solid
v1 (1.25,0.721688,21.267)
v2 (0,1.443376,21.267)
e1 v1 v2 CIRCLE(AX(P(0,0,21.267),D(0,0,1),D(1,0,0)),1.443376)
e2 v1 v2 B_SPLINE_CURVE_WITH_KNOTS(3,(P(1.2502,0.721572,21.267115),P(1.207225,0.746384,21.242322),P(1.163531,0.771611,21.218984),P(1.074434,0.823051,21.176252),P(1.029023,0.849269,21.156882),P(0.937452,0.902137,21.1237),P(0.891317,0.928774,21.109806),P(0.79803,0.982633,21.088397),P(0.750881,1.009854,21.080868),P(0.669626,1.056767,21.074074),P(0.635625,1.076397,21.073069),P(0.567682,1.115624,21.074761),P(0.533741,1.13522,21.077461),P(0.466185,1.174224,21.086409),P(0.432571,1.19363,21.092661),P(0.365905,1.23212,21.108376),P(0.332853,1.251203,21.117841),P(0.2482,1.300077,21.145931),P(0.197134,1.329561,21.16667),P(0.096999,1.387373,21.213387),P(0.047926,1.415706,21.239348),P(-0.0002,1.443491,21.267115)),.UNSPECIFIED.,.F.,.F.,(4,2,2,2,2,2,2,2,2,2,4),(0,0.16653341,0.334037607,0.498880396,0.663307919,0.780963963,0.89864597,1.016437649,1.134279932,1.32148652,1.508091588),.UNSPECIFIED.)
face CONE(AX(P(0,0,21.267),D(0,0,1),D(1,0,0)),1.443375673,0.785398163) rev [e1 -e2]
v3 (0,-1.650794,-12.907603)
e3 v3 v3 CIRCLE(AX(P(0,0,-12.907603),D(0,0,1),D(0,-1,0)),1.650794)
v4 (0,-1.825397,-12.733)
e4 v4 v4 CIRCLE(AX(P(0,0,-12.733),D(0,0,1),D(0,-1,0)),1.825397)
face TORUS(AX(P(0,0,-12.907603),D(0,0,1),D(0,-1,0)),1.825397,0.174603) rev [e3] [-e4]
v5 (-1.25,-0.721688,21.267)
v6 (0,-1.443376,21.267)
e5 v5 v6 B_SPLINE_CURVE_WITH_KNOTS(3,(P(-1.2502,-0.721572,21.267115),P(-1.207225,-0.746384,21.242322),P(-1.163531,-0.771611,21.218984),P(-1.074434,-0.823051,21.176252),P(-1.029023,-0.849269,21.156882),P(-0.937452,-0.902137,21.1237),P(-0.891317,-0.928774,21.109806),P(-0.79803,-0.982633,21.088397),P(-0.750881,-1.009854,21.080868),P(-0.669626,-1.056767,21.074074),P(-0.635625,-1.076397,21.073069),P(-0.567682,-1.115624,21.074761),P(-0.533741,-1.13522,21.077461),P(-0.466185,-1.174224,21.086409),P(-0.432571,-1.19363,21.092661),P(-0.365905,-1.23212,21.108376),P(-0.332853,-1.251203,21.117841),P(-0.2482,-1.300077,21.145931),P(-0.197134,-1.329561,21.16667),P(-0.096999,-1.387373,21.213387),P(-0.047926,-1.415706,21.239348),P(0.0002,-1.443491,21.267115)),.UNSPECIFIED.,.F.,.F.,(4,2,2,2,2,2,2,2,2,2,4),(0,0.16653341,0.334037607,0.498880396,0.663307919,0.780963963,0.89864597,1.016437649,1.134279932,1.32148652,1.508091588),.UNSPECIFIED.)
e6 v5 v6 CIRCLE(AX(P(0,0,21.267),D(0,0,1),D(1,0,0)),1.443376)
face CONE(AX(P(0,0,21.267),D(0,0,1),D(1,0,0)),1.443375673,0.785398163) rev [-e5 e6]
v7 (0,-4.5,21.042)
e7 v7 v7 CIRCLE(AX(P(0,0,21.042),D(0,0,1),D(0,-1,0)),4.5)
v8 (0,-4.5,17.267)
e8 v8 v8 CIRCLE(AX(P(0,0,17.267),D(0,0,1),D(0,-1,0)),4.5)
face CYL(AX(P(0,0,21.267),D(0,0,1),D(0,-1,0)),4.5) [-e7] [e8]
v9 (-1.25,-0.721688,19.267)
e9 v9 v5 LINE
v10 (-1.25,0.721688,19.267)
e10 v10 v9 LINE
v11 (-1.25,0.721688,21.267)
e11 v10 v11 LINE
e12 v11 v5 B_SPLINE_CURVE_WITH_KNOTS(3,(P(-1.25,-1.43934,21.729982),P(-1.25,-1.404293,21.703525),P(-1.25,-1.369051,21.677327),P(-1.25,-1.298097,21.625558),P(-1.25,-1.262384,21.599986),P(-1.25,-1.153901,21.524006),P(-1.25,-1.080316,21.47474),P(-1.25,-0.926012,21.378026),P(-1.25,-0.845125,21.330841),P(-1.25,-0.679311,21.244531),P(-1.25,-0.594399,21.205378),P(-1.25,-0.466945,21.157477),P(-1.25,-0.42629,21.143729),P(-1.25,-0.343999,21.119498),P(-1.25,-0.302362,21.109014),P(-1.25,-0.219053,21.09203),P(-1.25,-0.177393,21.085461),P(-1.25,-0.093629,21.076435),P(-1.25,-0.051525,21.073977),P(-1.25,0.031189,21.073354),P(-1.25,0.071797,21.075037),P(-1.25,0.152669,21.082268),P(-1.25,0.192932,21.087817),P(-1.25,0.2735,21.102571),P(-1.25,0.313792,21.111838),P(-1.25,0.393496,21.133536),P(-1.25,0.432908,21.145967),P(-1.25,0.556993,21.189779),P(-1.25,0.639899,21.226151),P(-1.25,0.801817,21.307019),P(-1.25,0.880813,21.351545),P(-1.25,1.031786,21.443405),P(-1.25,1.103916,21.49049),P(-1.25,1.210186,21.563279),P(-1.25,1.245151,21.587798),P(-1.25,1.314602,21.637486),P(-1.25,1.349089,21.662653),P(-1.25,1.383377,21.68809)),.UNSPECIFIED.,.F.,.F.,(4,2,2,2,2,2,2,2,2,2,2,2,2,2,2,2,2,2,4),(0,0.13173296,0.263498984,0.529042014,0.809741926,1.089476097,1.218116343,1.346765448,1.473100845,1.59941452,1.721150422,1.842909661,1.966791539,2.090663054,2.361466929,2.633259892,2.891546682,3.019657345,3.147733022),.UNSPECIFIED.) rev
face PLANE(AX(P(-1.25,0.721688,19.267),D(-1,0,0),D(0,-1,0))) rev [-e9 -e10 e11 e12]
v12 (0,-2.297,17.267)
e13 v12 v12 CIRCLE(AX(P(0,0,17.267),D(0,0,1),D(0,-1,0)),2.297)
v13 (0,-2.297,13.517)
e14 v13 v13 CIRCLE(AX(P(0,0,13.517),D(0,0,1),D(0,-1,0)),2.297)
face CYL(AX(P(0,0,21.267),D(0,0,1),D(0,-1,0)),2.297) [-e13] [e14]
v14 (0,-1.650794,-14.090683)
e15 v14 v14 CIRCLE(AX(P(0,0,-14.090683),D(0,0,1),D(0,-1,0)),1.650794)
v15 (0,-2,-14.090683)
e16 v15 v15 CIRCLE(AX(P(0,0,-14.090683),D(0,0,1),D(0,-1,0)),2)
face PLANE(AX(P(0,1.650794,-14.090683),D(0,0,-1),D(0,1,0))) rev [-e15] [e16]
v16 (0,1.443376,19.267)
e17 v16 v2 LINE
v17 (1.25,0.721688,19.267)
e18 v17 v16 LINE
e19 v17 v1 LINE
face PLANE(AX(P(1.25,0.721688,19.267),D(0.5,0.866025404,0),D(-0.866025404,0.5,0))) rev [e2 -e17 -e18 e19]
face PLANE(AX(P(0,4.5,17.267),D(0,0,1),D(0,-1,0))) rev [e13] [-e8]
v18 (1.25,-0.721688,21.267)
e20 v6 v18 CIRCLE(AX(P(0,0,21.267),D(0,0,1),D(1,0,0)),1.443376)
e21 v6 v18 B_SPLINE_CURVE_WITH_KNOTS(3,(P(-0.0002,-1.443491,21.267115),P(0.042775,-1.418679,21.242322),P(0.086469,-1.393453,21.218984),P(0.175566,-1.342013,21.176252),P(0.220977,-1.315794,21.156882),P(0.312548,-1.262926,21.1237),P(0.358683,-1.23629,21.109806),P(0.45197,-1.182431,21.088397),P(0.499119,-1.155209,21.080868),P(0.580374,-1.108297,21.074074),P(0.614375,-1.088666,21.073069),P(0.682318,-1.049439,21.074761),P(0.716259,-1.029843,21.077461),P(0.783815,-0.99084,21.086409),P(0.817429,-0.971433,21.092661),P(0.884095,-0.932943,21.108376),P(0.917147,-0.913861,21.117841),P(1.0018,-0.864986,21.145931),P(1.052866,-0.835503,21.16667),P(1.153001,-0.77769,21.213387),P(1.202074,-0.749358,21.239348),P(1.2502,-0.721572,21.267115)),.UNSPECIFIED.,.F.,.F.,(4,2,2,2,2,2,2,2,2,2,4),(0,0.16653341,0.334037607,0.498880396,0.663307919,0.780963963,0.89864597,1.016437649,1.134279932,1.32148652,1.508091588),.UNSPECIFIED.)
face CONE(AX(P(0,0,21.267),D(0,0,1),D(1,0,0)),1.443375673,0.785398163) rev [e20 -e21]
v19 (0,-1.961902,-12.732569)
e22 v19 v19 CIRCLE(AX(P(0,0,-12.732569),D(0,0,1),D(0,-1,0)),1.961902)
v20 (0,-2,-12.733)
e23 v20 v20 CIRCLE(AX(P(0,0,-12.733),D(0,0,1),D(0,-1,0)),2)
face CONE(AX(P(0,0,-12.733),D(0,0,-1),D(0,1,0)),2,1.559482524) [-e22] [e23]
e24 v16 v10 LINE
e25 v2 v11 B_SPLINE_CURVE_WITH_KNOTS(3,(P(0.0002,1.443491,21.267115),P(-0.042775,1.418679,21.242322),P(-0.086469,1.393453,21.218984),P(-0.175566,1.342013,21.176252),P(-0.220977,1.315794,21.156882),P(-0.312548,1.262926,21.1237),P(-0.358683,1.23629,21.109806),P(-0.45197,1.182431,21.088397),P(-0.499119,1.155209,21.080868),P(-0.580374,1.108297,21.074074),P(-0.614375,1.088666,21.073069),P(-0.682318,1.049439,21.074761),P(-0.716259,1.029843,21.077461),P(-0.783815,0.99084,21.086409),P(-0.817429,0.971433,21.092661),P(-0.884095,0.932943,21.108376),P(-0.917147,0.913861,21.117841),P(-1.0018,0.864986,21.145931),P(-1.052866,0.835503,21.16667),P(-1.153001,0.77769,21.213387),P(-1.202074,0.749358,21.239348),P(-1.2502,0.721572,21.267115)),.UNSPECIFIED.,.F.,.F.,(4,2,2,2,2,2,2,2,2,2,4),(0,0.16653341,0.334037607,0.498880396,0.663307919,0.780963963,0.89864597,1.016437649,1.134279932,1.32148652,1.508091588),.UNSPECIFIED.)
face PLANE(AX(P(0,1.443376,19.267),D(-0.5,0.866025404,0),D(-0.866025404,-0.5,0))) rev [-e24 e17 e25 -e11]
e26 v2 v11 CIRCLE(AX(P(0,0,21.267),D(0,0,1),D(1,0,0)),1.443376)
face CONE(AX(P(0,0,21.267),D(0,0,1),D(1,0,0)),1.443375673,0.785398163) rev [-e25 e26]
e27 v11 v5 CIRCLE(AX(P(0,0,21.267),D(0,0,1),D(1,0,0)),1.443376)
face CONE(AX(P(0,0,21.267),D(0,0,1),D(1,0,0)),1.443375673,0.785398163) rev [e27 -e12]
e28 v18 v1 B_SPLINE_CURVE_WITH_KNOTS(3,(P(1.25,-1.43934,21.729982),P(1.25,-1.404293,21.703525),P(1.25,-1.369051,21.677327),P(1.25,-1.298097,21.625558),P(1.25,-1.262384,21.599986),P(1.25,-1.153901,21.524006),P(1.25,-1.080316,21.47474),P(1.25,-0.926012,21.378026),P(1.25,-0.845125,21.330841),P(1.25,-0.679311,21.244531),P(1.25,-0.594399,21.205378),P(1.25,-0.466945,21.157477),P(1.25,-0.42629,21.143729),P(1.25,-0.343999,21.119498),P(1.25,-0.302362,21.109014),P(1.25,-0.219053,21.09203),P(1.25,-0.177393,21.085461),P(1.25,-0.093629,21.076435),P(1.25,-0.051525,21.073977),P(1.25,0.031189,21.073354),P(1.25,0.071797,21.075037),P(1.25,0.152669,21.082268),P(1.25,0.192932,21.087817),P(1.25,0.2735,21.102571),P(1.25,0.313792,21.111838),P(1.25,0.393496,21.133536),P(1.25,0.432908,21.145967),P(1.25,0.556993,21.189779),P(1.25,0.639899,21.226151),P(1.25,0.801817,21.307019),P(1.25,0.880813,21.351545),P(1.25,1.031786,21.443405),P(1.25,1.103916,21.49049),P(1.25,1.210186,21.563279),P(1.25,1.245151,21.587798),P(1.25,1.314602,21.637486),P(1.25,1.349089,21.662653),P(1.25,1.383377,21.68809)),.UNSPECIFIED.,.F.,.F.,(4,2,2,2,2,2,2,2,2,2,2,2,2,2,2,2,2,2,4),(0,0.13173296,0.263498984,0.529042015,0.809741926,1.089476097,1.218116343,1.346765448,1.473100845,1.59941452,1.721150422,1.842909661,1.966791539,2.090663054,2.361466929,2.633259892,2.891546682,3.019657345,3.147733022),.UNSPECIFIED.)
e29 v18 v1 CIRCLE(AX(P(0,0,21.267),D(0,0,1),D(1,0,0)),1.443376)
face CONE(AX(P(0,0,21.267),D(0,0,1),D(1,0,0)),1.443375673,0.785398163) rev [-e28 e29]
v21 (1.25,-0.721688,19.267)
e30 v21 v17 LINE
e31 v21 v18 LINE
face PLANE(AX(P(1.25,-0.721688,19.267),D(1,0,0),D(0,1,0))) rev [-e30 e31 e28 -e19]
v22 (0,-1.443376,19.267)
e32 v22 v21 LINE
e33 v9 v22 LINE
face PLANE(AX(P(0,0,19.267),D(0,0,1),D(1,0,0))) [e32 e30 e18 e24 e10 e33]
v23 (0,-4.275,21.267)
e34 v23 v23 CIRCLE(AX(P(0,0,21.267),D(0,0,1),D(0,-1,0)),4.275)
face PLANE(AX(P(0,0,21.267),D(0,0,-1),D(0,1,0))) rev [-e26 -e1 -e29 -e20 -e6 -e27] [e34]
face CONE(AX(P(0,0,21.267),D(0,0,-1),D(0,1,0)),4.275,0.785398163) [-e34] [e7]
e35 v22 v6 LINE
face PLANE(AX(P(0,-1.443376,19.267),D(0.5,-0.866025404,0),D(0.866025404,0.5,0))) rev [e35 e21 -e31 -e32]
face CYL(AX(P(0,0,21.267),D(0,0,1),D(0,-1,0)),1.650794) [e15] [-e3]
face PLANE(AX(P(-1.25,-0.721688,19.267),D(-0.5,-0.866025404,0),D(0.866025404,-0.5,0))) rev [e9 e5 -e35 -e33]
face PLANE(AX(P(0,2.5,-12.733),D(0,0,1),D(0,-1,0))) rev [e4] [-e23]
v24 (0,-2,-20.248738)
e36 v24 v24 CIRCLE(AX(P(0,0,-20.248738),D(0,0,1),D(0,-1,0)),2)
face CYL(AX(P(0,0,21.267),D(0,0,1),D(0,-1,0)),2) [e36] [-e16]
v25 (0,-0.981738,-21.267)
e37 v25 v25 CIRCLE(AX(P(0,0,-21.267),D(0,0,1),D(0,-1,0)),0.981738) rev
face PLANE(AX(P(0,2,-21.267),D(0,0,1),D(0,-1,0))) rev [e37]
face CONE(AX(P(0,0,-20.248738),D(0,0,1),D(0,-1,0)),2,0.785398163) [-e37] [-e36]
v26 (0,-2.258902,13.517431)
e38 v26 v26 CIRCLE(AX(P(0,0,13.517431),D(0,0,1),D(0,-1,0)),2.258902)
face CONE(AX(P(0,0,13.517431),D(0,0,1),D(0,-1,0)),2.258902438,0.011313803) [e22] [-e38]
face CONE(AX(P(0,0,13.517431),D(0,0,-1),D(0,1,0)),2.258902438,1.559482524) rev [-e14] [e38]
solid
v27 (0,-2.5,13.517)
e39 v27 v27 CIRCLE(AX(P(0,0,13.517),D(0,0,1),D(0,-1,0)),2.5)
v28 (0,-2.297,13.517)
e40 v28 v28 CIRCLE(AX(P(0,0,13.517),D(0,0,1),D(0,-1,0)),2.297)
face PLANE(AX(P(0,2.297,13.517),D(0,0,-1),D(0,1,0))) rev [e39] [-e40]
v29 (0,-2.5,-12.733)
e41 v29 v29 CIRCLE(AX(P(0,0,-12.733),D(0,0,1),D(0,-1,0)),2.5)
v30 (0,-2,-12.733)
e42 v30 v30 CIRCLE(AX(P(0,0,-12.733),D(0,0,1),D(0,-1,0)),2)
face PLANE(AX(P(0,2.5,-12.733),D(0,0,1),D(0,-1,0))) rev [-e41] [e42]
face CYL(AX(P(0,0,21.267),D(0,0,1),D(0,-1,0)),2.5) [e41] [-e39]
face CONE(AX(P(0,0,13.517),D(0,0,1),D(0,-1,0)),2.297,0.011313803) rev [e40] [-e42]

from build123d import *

# Parameters (mm, degrees)
CUT_EXTRUDE1_START = 21.267
CUT_EXTRUDE1_DEPTH = 2
CHAMFER2_SIZE      = 1.018261945


# Read off the part's stored shape, not the designer's step: Cut-Revolve-Thin1
with BuildPart() as part:
    # Sketch3 → Revolve1 (revolve)
    with BuildSketch(Plane(origin=(0, 0, 0), x_dir=(0, 0, -1), z_dir=(1, 0, 0)), mode=Mode.PRIVATE) as revolve1_sk:
        with BuildLine():
            Line((-21.267, 0), (-21.267, 4.2075))
            Line((-21.267, 4.2075), (-21.267, 4.5))
            Line((-21.267, 4.5), (-17.5595, 4.5))
            Line((-17.5595, 4.5), (-17.267, 4.5))
            Line((-17.267, 4.5), (-17.267, 2.297))
            Line((-17.267, 2.297), (-13.517, 2.297))
            Line((-13.517, 2.297), (-13.517, 2.5))
            Line((-13.517, 2.5), (12.733, 2.5))
            Line((12.733, 2.5), (12.733, 1.825397))
            ThreePointArc((12.733, 1.825397), (12.784140035, 1.701934035), (12.907603, 1.650794))
            Line((12.907603, 1.650794), (14.090682594, 1.650794))
            Line((14.090682594, 1.650794), (14.090682594, 2))
            Line((14.090682594, 2), (20.742, 2))
            Line((20.742, 2), (21.267, 2))
            Line((21.267, 2), (21.267, 0))
            Line((21.267, 0), (-21.267, 0))
        make_face()
    revolve(revolve1_sk.sketch.rotate(Axis((0, 0, 21.267), (0, 0, -1)), 180), axis=Axis((0, 0, 21.267), (0, 0, -1)))

    # Cut-Revolve-Thin1 outline → Cut-Revolve-Thin1 (revolve, cut)
    with BuildSketch(Plane.XZ):
        Polygon((2.258902438, 13.517431047), (1.961902438, -12.732568953), (2, -12.733), (2.297, 13.517), align=None)
    revolve(axis=Axis((0, 0, 0), (0, 0, 1)), mode=Mode.SUBTRACT)

    # Sketch4 → Cut-Extrude1 (cut)
    with BuildSketch(Plane.XY.offset(CUT_EXTRUDE1_START)):
        Polygon((0, 1.443375673), (-1.25, 0.721687836), (-1.25, -0.721687836), (0, -1.443375673), (1.25, -0.721687836), (1.25, 0.721687836), align=None)
    extrude(amount=-CUT_EXTRUDE1_DEPTH, mode=Mode.SUBTRACT)

    # Cut-Extrude2 cone 1 section (through the dimple's axis) → Cut-Extrude2 (revolve, cut)
    with BuildSketch(Plane(origin=(0, 0, 21.267), x_dir=(0, -1, 0), z_dir=(1, 0, 0))):
        Polygon((0, 0), (1.443375673, 0), (0, 1.443375673), align=None)
    revolve(axis=Axis((0, 0, 21.267), (0, 0, -1)), mode=Mode.SUBTRACT)

    # Chamfer2
    chamfer2_edges = [part.edges().sort_by_distance(p)[0] for p in [
        (0, 2, -21.267),
    ]]
    chamfer(chamfer2_edges, length=CHAMFER2_SIZE)

    # Sketch10 → Cut-Revolve2 (revolve, cut)
    with BuildSketch(Plane(origin=(0, 0, 0), x_dir=(0, 0, -1), z_dir=(1, 0, 0)), mode=Mode.PRIVATE) as cut_revolve2_sk:
        Polygon((-21.267, 4.275), (-21.042, 4.5), (-21.267, 4.5), align=None)
    revolve(cut_revolve2_sk.sketch.rotate(Axis((0, 0, 21.267), (0, 0, -1)), 180), axis=Axis((0, 0, 21.267), (0, 0, -1)), mode=Mode.SUBTRACT)


solid = part.part
